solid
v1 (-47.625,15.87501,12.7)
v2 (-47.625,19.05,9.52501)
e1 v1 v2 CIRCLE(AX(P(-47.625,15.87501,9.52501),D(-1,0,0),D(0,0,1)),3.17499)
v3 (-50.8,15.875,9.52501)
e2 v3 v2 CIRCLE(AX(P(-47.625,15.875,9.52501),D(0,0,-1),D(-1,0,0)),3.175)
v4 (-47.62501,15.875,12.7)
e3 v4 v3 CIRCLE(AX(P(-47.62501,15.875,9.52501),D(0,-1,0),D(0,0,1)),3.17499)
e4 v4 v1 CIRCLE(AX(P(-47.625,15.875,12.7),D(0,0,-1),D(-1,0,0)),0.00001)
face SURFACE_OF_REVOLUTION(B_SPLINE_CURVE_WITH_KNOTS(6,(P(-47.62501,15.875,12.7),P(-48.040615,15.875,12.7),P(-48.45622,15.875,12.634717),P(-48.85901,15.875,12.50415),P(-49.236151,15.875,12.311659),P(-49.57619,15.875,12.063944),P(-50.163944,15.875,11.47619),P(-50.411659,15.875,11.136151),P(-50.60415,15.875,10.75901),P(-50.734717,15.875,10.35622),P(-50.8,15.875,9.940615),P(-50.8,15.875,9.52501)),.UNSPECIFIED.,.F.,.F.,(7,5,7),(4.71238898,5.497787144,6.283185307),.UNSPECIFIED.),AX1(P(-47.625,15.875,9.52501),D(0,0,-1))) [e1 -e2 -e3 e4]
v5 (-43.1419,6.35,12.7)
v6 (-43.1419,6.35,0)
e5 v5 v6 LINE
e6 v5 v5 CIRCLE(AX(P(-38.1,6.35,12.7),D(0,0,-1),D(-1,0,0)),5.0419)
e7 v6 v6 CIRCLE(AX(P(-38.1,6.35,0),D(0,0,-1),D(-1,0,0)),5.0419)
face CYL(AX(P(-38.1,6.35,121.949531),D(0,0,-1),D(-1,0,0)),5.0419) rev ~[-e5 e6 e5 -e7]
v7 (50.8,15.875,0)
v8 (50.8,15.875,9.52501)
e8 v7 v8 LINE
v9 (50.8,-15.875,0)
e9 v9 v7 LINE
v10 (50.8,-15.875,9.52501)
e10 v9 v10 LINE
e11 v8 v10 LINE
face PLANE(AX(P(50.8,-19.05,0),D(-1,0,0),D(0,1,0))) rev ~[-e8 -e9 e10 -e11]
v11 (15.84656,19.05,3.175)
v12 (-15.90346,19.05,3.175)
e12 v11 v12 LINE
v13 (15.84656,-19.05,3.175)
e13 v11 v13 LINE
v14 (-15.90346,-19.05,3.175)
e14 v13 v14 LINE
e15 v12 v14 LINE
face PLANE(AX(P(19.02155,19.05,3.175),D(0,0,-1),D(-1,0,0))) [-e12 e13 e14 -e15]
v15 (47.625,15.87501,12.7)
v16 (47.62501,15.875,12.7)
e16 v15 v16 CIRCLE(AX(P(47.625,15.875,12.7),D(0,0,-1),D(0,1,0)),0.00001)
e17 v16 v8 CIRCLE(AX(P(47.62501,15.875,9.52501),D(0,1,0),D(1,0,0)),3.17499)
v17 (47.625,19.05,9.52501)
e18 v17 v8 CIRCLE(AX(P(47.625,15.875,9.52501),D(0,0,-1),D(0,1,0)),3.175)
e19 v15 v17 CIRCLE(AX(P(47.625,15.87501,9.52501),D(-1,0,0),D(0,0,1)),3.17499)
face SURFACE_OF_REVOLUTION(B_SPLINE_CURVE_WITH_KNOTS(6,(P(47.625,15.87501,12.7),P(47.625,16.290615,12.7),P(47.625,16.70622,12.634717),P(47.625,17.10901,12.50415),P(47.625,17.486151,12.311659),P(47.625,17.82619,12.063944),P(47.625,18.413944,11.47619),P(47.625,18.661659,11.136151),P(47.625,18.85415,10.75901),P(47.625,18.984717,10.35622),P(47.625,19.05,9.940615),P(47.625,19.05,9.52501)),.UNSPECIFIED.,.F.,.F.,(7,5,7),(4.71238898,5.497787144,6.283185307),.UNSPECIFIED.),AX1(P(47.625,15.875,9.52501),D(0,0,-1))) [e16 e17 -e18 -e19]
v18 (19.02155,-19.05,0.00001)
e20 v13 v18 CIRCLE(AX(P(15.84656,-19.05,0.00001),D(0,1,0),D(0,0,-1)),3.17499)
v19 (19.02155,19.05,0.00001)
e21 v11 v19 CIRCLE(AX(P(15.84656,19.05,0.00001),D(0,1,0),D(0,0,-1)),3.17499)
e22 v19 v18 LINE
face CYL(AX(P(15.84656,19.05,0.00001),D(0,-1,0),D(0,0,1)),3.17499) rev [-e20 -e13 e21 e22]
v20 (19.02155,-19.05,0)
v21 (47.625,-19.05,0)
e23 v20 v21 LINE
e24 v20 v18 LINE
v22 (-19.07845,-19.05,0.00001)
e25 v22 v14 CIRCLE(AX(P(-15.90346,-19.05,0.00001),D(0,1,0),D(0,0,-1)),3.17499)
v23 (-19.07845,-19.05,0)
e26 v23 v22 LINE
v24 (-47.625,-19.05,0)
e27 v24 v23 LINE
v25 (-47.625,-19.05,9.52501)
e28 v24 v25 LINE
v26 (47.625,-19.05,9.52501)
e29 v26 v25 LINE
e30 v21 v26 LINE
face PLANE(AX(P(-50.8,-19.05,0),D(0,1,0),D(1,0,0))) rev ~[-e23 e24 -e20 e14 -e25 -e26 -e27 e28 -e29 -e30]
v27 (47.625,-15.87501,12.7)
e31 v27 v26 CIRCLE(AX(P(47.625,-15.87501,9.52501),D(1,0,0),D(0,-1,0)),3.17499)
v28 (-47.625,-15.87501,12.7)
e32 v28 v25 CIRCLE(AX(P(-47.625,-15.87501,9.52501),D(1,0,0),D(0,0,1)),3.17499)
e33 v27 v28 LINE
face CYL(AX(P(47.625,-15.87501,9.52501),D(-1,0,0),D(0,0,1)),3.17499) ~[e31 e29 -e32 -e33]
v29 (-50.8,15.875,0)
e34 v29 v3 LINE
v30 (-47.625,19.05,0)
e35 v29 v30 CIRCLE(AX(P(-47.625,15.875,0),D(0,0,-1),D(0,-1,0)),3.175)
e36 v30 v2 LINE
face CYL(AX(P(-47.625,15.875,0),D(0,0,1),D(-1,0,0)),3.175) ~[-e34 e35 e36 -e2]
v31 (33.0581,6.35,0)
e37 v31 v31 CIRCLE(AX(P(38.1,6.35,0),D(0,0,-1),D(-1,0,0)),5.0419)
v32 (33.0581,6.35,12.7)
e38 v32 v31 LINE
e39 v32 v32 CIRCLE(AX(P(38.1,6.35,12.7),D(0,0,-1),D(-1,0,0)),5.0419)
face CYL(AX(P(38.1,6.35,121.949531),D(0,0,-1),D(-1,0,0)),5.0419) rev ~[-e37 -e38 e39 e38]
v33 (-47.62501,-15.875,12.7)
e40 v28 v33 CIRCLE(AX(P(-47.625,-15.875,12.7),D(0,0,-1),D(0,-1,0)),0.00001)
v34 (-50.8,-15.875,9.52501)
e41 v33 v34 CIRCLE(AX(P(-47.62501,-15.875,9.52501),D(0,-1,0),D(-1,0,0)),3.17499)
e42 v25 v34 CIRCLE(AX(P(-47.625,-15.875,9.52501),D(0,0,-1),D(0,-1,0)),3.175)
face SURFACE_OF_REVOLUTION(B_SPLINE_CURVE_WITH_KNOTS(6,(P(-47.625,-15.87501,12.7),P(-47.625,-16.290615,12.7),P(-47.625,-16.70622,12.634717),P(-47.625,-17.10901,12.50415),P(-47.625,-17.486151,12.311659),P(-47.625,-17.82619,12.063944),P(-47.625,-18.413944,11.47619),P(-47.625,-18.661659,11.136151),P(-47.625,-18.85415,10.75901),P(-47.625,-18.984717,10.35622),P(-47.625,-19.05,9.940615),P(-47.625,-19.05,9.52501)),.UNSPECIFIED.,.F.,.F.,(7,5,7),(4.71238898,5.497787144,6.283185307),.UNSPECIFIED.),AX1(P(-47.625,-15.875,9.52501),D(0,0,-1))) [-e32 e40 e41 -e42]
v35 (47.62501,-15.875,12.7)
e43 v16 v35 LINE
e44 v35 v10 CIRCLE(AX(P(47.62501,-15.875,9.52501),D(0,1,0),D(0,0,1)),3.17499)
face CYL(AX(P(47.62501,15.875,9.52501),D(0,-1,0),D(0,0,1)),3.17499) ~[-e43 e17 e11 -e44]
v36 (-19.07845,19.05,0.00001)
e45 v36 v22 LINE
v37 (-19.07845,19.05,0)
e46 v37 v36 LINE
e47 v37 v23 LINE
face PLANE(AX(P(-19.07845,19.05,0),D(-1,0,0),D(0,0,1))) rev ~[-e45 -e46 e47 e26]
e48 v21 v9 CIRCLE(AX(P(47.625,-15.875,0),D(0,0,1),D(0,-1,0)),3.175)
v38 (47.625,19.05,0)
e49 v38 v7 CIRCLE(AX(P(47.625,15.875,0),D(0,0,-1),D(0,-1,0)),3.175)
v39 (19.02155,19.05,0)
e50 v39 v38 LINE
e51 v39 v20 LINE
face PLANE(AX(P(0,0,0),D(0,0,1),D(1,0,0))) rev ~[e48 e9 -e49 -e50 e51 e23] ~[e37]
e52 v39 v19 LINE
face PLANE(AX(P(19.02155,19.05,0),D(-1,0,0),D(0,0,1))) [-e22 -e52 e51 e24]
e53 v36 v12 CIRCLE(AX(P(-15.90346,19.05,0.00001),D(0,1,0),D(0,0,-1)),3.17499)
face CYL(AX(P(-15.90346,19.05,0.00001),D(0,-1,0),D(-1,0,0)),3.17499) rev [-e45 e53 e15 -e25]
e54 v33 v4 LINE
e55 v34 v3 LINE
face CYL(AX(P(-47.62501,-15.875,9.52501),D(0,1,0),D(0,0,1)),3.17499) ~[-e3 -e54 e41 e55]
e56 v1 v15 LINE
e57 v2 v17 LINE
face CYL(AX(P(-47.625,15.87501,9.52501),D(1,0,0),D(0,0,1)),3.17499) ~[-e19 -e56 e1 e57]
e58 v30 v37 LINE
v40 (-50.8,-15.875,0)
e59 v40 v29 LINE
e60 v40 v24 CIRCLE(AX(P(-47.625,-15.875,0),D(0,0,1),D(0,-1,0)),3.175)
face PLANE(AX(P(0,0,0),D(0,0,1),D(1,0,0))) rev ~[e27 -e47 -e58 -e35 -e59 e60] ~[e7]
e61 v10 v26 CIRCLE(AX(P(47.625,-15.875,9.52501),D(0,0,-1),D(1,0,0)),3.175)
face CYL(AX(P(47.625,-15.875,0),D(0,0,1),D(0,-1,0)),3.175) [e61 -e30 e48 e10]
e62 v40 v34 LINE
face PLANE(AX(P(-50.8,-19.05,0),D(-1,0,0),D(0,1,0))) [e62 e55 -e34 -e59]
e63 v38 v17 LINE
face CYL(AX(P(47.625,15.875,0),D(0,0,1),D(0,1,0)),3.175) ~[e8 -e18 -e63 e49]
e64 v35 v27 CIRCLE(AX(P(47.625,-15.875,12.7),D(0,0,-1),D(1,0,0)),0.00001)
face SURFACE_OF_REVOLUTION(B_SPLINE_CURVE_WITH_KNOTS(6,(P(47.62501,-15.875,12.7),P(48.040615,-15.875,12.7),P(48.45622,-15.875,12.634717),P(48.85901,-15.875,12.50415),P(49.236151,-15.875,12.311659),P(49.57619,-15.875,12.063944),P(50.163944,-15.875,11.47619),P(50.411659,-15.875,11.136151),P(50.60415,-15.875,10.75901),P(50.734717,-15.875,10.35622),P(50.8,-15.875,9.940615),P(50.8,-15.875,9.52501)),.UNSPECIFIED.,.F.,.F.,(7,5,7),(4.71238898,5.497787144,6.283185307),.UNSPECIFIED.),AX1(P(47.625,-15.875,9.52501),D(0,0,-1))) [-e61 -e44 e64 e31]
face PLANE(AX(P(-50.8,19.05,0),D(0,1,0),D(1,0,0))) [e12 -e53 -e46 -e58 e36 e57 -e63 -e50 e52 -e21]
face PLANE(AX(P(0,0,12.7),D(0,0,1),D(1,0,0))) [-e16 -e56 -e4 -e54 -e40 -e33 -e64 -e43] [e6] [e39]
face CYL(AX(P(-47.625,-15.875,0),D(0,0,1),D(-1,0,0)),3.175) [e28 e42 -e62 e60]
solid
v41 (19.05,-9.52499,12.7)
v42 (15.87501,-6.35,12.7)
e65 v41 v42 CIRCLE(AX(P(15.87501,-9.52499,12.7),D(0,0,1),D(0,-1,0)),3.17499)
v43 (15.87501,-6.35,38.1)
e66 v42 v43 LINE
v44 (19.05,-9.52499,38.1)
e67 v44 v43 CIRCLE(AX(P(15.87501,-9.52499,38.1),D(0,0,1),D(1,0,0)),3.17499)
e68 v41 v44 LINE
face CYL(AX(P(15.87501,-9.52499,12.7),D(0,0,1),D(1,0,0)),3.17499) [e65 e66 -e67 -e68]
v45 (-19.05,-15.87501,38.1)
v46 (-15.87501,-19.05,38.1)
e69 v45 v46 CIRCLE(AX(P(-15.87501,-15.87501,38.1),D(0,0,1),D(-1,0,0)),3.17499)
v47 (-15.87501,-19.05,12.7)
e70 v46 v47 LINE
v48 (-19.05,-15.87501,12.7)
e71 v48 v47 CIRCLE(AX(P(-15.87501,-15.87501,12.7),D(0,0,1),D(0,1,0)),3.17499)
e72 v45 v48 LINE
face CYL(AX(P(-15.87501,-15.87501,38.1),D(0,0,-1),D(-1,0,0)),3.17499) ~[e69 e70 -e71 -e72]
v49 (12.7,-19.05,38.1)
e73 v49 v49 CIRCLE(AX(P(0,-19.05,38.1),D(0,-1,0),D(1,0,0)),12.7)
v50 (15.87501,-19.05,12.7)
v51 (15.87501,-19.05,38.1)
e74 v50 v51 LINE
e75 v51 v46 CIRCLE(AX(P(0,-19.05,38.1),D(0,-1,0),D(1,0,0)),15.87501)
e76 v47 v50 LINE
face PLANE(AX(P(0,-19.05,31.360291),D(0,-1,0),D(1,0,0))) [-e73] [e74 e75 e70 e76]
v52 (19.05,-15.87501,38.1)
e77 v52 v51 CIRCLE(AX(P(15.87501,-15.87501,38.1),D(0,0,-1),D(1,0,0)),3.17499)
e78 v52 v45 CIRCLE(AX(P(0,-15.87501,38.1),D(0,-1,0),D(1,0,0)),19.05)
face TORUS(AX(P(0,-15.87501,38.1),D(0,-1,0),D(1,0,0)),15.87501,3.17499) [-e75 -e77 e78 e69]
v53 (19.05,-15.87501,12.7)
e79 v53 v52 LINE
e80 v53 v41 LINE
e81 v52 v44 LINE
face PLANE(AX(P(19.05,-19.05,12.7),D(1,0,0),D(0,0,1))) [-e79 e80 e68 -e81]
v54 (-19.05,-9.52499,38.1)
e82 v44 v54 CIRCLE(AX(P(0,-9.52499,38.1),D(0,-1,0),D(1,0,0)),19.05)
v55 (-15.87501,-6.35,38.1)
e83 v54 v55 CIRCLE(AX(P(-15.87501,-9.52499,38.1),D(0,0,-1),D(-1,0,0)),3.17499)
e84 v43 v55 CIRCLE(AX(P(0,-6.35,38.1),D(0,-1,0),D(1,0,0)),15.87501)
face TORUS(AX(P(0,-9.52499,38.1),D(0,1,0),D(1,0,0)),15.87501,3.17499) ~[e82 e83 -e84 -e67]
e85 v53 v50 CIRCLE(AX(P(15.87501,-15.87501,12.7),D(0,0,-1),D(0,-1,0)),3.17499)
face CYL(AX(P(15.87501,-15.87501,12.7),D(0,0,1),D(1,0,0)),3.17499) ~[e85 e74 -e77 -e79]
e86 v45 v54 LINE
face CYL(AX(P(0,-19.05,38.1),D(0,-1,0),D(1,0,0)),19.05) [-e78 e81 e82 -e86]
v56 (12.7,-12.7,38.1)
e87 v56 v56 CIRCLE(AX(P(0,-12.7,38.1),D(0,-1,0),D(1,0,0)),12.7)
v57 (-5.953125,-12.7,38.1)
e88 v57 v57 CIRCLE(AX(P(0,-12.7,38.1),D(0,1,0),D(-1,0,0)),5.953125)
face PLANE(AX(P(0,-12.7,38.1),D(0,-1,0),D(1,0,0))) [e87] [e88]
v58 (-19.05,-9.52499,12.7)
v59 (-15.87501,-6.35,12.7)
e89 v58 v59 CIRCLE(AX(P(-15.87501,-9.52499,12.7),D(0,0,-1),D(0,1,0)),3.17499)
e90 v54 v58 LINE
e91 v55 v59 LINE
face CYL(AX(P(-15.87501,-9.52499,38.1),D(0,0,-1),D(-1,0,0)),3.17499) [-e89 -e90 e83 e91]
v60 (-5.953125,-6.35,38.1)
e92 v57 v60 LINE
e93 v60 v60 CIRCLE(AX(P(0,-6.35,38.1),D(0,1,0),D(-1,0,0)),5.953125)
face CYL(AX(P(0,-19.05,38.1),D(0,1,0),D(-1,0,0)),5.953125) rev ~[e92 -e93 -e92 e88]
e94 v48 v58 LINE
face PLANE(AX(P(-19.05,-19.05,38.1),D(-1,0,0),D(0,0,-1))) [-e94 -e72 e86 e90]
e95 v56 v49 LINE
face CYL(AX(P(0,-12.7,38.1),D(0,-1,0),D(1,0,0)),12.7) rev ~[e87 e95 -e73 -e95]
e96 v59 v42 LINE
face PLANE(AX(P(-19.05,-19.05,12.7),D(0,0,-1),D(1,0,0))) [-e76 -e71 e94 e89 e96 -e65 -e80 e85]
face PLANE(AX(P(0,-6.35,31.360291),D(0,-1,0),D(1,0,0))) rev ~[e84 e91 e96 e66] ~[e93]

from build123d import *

# Parameters (mm, degrees)
F0_W           = 101.6
F0_H           = 38.1
F1_DEPTH       = 12.7
F3_DEPTH       = 12.7
F5_D           = 11.90625
F5_CBORE_D     = 25.4
F5_CBORE_DEPTH = 6.35
F6_W           = 38.1
F6_H           = 3.175
F7_DEPTH       = 38.101
F9_D           = 10.0838
F10_D          = 10.0838
F11_R          = 3.175
F12_R          = 3.17499
F12_2_R        = 3.17499


# Not quite as in the source:
# - a fillet or chamfer is up to 0.001 mm smaller than in the source, because OpenCascade refuses the exact size
# - a length typed as a fraction of an inch, garbled in the dataset ("3 / 203.2 mm" for 3/8 in), is restored


with BuildPart() as f1:
    # F0 (on Top) → F1 (new body)
    with BuildSketch(Plane.XY):
        Rectangle(F0_W, F0_H)
    extrude(amount=F1_DEPTH)

    # F6 (on face) → F7 (cut, through all)
    with BuildSketch(Plane(origin=(0, 19.05, 0), x_dir=(-1, 0, 0), z_dir=(0, 1, 0))):
        with Locations((0.028450042, 1.5875)):
            Rectangle(F6_W, F6_H)
    extrude(amount=-F7_DEPTH, mode=Mode.SUBTRACT)

    # F9 (through all)
    with Locations(Plane.XY.offset(12.7)):
        with Locations((-38.1, 6.35)):
            Hole(F9_D / 2)

    # F10 (through all)
    with Locations(Plane.XY.offset(12.7)):
        with Locations((38.1, 6.35)):
            Hole(F10_D / 2)

    # F11
    f11_edges = [f1.edges().sort_by_distance(p)[0] for p in [
        (50.8, -19.05, 6.35),
        (50.8, 19.05, 6.35),
        (-50.8, -19.05, 6.35),
        (-50.8, 19.05, 6.35),
    ]]
    fillet(f11_edges, radius=F11_R)

    # F12 (radius 3.175 in the source; OpenCascade refuses exactly that, so slightly less here)
    f12_edges = [f1.edges().sort_by_distance(p)[0] for p in [
        (19.02155, 0, 3.175),
        (-19.07845, 0, 3.175),
        (0, 19.05, 12.7),
    ]]
    fillet(f12_edges, radius=F12_R)


with BuildPart() as f3:
    # F2 (on face) → F3 (new body)
    with BuildSketch(Plane.XZ.offset(19.05)):
        with BuildLine():
            Line((-19.05, 38.1), (-19.05, 12.7))
            Line((-19.05, 12.7), (19.05, 12.7))
            Line((19.05, 12.7), (19.05, 38.1))
            ThreePointArc((19.05, 38.1), (0, 57.15), (-19.05, 38.1))
        make_face()
    extrude(amount=-F3_DEPTH)

    # F5 (through all)
    with Locations(Plane.XZ.offset(19.05)):
        with Locations((0, 38.1)):
            CounterBoreHole(F5_D / 2, F5_CBORE_D / 2, F5_CBORE_DEPTH)

    # F12#2 (radius 3.175 in the source; OpenCascade refuses exactly that, so slightly less here)
    f12_2_edges = [f3.edges().sort_by_distance(p)[0] for p in [
        (0, -19.05, 57.15),
        (0, -6.35, 57.15),
        (19.05, -19.05, 25.4),
        (19.05, -6.35, 25.4),
        (-19.05, -19.05, 25.4),
        (-19.05, -6.35, 25.4),
    ]]
    fillet(f12_2_edges, radius=F12_2_R)


solid = Compound([f1.part, f3.part])
